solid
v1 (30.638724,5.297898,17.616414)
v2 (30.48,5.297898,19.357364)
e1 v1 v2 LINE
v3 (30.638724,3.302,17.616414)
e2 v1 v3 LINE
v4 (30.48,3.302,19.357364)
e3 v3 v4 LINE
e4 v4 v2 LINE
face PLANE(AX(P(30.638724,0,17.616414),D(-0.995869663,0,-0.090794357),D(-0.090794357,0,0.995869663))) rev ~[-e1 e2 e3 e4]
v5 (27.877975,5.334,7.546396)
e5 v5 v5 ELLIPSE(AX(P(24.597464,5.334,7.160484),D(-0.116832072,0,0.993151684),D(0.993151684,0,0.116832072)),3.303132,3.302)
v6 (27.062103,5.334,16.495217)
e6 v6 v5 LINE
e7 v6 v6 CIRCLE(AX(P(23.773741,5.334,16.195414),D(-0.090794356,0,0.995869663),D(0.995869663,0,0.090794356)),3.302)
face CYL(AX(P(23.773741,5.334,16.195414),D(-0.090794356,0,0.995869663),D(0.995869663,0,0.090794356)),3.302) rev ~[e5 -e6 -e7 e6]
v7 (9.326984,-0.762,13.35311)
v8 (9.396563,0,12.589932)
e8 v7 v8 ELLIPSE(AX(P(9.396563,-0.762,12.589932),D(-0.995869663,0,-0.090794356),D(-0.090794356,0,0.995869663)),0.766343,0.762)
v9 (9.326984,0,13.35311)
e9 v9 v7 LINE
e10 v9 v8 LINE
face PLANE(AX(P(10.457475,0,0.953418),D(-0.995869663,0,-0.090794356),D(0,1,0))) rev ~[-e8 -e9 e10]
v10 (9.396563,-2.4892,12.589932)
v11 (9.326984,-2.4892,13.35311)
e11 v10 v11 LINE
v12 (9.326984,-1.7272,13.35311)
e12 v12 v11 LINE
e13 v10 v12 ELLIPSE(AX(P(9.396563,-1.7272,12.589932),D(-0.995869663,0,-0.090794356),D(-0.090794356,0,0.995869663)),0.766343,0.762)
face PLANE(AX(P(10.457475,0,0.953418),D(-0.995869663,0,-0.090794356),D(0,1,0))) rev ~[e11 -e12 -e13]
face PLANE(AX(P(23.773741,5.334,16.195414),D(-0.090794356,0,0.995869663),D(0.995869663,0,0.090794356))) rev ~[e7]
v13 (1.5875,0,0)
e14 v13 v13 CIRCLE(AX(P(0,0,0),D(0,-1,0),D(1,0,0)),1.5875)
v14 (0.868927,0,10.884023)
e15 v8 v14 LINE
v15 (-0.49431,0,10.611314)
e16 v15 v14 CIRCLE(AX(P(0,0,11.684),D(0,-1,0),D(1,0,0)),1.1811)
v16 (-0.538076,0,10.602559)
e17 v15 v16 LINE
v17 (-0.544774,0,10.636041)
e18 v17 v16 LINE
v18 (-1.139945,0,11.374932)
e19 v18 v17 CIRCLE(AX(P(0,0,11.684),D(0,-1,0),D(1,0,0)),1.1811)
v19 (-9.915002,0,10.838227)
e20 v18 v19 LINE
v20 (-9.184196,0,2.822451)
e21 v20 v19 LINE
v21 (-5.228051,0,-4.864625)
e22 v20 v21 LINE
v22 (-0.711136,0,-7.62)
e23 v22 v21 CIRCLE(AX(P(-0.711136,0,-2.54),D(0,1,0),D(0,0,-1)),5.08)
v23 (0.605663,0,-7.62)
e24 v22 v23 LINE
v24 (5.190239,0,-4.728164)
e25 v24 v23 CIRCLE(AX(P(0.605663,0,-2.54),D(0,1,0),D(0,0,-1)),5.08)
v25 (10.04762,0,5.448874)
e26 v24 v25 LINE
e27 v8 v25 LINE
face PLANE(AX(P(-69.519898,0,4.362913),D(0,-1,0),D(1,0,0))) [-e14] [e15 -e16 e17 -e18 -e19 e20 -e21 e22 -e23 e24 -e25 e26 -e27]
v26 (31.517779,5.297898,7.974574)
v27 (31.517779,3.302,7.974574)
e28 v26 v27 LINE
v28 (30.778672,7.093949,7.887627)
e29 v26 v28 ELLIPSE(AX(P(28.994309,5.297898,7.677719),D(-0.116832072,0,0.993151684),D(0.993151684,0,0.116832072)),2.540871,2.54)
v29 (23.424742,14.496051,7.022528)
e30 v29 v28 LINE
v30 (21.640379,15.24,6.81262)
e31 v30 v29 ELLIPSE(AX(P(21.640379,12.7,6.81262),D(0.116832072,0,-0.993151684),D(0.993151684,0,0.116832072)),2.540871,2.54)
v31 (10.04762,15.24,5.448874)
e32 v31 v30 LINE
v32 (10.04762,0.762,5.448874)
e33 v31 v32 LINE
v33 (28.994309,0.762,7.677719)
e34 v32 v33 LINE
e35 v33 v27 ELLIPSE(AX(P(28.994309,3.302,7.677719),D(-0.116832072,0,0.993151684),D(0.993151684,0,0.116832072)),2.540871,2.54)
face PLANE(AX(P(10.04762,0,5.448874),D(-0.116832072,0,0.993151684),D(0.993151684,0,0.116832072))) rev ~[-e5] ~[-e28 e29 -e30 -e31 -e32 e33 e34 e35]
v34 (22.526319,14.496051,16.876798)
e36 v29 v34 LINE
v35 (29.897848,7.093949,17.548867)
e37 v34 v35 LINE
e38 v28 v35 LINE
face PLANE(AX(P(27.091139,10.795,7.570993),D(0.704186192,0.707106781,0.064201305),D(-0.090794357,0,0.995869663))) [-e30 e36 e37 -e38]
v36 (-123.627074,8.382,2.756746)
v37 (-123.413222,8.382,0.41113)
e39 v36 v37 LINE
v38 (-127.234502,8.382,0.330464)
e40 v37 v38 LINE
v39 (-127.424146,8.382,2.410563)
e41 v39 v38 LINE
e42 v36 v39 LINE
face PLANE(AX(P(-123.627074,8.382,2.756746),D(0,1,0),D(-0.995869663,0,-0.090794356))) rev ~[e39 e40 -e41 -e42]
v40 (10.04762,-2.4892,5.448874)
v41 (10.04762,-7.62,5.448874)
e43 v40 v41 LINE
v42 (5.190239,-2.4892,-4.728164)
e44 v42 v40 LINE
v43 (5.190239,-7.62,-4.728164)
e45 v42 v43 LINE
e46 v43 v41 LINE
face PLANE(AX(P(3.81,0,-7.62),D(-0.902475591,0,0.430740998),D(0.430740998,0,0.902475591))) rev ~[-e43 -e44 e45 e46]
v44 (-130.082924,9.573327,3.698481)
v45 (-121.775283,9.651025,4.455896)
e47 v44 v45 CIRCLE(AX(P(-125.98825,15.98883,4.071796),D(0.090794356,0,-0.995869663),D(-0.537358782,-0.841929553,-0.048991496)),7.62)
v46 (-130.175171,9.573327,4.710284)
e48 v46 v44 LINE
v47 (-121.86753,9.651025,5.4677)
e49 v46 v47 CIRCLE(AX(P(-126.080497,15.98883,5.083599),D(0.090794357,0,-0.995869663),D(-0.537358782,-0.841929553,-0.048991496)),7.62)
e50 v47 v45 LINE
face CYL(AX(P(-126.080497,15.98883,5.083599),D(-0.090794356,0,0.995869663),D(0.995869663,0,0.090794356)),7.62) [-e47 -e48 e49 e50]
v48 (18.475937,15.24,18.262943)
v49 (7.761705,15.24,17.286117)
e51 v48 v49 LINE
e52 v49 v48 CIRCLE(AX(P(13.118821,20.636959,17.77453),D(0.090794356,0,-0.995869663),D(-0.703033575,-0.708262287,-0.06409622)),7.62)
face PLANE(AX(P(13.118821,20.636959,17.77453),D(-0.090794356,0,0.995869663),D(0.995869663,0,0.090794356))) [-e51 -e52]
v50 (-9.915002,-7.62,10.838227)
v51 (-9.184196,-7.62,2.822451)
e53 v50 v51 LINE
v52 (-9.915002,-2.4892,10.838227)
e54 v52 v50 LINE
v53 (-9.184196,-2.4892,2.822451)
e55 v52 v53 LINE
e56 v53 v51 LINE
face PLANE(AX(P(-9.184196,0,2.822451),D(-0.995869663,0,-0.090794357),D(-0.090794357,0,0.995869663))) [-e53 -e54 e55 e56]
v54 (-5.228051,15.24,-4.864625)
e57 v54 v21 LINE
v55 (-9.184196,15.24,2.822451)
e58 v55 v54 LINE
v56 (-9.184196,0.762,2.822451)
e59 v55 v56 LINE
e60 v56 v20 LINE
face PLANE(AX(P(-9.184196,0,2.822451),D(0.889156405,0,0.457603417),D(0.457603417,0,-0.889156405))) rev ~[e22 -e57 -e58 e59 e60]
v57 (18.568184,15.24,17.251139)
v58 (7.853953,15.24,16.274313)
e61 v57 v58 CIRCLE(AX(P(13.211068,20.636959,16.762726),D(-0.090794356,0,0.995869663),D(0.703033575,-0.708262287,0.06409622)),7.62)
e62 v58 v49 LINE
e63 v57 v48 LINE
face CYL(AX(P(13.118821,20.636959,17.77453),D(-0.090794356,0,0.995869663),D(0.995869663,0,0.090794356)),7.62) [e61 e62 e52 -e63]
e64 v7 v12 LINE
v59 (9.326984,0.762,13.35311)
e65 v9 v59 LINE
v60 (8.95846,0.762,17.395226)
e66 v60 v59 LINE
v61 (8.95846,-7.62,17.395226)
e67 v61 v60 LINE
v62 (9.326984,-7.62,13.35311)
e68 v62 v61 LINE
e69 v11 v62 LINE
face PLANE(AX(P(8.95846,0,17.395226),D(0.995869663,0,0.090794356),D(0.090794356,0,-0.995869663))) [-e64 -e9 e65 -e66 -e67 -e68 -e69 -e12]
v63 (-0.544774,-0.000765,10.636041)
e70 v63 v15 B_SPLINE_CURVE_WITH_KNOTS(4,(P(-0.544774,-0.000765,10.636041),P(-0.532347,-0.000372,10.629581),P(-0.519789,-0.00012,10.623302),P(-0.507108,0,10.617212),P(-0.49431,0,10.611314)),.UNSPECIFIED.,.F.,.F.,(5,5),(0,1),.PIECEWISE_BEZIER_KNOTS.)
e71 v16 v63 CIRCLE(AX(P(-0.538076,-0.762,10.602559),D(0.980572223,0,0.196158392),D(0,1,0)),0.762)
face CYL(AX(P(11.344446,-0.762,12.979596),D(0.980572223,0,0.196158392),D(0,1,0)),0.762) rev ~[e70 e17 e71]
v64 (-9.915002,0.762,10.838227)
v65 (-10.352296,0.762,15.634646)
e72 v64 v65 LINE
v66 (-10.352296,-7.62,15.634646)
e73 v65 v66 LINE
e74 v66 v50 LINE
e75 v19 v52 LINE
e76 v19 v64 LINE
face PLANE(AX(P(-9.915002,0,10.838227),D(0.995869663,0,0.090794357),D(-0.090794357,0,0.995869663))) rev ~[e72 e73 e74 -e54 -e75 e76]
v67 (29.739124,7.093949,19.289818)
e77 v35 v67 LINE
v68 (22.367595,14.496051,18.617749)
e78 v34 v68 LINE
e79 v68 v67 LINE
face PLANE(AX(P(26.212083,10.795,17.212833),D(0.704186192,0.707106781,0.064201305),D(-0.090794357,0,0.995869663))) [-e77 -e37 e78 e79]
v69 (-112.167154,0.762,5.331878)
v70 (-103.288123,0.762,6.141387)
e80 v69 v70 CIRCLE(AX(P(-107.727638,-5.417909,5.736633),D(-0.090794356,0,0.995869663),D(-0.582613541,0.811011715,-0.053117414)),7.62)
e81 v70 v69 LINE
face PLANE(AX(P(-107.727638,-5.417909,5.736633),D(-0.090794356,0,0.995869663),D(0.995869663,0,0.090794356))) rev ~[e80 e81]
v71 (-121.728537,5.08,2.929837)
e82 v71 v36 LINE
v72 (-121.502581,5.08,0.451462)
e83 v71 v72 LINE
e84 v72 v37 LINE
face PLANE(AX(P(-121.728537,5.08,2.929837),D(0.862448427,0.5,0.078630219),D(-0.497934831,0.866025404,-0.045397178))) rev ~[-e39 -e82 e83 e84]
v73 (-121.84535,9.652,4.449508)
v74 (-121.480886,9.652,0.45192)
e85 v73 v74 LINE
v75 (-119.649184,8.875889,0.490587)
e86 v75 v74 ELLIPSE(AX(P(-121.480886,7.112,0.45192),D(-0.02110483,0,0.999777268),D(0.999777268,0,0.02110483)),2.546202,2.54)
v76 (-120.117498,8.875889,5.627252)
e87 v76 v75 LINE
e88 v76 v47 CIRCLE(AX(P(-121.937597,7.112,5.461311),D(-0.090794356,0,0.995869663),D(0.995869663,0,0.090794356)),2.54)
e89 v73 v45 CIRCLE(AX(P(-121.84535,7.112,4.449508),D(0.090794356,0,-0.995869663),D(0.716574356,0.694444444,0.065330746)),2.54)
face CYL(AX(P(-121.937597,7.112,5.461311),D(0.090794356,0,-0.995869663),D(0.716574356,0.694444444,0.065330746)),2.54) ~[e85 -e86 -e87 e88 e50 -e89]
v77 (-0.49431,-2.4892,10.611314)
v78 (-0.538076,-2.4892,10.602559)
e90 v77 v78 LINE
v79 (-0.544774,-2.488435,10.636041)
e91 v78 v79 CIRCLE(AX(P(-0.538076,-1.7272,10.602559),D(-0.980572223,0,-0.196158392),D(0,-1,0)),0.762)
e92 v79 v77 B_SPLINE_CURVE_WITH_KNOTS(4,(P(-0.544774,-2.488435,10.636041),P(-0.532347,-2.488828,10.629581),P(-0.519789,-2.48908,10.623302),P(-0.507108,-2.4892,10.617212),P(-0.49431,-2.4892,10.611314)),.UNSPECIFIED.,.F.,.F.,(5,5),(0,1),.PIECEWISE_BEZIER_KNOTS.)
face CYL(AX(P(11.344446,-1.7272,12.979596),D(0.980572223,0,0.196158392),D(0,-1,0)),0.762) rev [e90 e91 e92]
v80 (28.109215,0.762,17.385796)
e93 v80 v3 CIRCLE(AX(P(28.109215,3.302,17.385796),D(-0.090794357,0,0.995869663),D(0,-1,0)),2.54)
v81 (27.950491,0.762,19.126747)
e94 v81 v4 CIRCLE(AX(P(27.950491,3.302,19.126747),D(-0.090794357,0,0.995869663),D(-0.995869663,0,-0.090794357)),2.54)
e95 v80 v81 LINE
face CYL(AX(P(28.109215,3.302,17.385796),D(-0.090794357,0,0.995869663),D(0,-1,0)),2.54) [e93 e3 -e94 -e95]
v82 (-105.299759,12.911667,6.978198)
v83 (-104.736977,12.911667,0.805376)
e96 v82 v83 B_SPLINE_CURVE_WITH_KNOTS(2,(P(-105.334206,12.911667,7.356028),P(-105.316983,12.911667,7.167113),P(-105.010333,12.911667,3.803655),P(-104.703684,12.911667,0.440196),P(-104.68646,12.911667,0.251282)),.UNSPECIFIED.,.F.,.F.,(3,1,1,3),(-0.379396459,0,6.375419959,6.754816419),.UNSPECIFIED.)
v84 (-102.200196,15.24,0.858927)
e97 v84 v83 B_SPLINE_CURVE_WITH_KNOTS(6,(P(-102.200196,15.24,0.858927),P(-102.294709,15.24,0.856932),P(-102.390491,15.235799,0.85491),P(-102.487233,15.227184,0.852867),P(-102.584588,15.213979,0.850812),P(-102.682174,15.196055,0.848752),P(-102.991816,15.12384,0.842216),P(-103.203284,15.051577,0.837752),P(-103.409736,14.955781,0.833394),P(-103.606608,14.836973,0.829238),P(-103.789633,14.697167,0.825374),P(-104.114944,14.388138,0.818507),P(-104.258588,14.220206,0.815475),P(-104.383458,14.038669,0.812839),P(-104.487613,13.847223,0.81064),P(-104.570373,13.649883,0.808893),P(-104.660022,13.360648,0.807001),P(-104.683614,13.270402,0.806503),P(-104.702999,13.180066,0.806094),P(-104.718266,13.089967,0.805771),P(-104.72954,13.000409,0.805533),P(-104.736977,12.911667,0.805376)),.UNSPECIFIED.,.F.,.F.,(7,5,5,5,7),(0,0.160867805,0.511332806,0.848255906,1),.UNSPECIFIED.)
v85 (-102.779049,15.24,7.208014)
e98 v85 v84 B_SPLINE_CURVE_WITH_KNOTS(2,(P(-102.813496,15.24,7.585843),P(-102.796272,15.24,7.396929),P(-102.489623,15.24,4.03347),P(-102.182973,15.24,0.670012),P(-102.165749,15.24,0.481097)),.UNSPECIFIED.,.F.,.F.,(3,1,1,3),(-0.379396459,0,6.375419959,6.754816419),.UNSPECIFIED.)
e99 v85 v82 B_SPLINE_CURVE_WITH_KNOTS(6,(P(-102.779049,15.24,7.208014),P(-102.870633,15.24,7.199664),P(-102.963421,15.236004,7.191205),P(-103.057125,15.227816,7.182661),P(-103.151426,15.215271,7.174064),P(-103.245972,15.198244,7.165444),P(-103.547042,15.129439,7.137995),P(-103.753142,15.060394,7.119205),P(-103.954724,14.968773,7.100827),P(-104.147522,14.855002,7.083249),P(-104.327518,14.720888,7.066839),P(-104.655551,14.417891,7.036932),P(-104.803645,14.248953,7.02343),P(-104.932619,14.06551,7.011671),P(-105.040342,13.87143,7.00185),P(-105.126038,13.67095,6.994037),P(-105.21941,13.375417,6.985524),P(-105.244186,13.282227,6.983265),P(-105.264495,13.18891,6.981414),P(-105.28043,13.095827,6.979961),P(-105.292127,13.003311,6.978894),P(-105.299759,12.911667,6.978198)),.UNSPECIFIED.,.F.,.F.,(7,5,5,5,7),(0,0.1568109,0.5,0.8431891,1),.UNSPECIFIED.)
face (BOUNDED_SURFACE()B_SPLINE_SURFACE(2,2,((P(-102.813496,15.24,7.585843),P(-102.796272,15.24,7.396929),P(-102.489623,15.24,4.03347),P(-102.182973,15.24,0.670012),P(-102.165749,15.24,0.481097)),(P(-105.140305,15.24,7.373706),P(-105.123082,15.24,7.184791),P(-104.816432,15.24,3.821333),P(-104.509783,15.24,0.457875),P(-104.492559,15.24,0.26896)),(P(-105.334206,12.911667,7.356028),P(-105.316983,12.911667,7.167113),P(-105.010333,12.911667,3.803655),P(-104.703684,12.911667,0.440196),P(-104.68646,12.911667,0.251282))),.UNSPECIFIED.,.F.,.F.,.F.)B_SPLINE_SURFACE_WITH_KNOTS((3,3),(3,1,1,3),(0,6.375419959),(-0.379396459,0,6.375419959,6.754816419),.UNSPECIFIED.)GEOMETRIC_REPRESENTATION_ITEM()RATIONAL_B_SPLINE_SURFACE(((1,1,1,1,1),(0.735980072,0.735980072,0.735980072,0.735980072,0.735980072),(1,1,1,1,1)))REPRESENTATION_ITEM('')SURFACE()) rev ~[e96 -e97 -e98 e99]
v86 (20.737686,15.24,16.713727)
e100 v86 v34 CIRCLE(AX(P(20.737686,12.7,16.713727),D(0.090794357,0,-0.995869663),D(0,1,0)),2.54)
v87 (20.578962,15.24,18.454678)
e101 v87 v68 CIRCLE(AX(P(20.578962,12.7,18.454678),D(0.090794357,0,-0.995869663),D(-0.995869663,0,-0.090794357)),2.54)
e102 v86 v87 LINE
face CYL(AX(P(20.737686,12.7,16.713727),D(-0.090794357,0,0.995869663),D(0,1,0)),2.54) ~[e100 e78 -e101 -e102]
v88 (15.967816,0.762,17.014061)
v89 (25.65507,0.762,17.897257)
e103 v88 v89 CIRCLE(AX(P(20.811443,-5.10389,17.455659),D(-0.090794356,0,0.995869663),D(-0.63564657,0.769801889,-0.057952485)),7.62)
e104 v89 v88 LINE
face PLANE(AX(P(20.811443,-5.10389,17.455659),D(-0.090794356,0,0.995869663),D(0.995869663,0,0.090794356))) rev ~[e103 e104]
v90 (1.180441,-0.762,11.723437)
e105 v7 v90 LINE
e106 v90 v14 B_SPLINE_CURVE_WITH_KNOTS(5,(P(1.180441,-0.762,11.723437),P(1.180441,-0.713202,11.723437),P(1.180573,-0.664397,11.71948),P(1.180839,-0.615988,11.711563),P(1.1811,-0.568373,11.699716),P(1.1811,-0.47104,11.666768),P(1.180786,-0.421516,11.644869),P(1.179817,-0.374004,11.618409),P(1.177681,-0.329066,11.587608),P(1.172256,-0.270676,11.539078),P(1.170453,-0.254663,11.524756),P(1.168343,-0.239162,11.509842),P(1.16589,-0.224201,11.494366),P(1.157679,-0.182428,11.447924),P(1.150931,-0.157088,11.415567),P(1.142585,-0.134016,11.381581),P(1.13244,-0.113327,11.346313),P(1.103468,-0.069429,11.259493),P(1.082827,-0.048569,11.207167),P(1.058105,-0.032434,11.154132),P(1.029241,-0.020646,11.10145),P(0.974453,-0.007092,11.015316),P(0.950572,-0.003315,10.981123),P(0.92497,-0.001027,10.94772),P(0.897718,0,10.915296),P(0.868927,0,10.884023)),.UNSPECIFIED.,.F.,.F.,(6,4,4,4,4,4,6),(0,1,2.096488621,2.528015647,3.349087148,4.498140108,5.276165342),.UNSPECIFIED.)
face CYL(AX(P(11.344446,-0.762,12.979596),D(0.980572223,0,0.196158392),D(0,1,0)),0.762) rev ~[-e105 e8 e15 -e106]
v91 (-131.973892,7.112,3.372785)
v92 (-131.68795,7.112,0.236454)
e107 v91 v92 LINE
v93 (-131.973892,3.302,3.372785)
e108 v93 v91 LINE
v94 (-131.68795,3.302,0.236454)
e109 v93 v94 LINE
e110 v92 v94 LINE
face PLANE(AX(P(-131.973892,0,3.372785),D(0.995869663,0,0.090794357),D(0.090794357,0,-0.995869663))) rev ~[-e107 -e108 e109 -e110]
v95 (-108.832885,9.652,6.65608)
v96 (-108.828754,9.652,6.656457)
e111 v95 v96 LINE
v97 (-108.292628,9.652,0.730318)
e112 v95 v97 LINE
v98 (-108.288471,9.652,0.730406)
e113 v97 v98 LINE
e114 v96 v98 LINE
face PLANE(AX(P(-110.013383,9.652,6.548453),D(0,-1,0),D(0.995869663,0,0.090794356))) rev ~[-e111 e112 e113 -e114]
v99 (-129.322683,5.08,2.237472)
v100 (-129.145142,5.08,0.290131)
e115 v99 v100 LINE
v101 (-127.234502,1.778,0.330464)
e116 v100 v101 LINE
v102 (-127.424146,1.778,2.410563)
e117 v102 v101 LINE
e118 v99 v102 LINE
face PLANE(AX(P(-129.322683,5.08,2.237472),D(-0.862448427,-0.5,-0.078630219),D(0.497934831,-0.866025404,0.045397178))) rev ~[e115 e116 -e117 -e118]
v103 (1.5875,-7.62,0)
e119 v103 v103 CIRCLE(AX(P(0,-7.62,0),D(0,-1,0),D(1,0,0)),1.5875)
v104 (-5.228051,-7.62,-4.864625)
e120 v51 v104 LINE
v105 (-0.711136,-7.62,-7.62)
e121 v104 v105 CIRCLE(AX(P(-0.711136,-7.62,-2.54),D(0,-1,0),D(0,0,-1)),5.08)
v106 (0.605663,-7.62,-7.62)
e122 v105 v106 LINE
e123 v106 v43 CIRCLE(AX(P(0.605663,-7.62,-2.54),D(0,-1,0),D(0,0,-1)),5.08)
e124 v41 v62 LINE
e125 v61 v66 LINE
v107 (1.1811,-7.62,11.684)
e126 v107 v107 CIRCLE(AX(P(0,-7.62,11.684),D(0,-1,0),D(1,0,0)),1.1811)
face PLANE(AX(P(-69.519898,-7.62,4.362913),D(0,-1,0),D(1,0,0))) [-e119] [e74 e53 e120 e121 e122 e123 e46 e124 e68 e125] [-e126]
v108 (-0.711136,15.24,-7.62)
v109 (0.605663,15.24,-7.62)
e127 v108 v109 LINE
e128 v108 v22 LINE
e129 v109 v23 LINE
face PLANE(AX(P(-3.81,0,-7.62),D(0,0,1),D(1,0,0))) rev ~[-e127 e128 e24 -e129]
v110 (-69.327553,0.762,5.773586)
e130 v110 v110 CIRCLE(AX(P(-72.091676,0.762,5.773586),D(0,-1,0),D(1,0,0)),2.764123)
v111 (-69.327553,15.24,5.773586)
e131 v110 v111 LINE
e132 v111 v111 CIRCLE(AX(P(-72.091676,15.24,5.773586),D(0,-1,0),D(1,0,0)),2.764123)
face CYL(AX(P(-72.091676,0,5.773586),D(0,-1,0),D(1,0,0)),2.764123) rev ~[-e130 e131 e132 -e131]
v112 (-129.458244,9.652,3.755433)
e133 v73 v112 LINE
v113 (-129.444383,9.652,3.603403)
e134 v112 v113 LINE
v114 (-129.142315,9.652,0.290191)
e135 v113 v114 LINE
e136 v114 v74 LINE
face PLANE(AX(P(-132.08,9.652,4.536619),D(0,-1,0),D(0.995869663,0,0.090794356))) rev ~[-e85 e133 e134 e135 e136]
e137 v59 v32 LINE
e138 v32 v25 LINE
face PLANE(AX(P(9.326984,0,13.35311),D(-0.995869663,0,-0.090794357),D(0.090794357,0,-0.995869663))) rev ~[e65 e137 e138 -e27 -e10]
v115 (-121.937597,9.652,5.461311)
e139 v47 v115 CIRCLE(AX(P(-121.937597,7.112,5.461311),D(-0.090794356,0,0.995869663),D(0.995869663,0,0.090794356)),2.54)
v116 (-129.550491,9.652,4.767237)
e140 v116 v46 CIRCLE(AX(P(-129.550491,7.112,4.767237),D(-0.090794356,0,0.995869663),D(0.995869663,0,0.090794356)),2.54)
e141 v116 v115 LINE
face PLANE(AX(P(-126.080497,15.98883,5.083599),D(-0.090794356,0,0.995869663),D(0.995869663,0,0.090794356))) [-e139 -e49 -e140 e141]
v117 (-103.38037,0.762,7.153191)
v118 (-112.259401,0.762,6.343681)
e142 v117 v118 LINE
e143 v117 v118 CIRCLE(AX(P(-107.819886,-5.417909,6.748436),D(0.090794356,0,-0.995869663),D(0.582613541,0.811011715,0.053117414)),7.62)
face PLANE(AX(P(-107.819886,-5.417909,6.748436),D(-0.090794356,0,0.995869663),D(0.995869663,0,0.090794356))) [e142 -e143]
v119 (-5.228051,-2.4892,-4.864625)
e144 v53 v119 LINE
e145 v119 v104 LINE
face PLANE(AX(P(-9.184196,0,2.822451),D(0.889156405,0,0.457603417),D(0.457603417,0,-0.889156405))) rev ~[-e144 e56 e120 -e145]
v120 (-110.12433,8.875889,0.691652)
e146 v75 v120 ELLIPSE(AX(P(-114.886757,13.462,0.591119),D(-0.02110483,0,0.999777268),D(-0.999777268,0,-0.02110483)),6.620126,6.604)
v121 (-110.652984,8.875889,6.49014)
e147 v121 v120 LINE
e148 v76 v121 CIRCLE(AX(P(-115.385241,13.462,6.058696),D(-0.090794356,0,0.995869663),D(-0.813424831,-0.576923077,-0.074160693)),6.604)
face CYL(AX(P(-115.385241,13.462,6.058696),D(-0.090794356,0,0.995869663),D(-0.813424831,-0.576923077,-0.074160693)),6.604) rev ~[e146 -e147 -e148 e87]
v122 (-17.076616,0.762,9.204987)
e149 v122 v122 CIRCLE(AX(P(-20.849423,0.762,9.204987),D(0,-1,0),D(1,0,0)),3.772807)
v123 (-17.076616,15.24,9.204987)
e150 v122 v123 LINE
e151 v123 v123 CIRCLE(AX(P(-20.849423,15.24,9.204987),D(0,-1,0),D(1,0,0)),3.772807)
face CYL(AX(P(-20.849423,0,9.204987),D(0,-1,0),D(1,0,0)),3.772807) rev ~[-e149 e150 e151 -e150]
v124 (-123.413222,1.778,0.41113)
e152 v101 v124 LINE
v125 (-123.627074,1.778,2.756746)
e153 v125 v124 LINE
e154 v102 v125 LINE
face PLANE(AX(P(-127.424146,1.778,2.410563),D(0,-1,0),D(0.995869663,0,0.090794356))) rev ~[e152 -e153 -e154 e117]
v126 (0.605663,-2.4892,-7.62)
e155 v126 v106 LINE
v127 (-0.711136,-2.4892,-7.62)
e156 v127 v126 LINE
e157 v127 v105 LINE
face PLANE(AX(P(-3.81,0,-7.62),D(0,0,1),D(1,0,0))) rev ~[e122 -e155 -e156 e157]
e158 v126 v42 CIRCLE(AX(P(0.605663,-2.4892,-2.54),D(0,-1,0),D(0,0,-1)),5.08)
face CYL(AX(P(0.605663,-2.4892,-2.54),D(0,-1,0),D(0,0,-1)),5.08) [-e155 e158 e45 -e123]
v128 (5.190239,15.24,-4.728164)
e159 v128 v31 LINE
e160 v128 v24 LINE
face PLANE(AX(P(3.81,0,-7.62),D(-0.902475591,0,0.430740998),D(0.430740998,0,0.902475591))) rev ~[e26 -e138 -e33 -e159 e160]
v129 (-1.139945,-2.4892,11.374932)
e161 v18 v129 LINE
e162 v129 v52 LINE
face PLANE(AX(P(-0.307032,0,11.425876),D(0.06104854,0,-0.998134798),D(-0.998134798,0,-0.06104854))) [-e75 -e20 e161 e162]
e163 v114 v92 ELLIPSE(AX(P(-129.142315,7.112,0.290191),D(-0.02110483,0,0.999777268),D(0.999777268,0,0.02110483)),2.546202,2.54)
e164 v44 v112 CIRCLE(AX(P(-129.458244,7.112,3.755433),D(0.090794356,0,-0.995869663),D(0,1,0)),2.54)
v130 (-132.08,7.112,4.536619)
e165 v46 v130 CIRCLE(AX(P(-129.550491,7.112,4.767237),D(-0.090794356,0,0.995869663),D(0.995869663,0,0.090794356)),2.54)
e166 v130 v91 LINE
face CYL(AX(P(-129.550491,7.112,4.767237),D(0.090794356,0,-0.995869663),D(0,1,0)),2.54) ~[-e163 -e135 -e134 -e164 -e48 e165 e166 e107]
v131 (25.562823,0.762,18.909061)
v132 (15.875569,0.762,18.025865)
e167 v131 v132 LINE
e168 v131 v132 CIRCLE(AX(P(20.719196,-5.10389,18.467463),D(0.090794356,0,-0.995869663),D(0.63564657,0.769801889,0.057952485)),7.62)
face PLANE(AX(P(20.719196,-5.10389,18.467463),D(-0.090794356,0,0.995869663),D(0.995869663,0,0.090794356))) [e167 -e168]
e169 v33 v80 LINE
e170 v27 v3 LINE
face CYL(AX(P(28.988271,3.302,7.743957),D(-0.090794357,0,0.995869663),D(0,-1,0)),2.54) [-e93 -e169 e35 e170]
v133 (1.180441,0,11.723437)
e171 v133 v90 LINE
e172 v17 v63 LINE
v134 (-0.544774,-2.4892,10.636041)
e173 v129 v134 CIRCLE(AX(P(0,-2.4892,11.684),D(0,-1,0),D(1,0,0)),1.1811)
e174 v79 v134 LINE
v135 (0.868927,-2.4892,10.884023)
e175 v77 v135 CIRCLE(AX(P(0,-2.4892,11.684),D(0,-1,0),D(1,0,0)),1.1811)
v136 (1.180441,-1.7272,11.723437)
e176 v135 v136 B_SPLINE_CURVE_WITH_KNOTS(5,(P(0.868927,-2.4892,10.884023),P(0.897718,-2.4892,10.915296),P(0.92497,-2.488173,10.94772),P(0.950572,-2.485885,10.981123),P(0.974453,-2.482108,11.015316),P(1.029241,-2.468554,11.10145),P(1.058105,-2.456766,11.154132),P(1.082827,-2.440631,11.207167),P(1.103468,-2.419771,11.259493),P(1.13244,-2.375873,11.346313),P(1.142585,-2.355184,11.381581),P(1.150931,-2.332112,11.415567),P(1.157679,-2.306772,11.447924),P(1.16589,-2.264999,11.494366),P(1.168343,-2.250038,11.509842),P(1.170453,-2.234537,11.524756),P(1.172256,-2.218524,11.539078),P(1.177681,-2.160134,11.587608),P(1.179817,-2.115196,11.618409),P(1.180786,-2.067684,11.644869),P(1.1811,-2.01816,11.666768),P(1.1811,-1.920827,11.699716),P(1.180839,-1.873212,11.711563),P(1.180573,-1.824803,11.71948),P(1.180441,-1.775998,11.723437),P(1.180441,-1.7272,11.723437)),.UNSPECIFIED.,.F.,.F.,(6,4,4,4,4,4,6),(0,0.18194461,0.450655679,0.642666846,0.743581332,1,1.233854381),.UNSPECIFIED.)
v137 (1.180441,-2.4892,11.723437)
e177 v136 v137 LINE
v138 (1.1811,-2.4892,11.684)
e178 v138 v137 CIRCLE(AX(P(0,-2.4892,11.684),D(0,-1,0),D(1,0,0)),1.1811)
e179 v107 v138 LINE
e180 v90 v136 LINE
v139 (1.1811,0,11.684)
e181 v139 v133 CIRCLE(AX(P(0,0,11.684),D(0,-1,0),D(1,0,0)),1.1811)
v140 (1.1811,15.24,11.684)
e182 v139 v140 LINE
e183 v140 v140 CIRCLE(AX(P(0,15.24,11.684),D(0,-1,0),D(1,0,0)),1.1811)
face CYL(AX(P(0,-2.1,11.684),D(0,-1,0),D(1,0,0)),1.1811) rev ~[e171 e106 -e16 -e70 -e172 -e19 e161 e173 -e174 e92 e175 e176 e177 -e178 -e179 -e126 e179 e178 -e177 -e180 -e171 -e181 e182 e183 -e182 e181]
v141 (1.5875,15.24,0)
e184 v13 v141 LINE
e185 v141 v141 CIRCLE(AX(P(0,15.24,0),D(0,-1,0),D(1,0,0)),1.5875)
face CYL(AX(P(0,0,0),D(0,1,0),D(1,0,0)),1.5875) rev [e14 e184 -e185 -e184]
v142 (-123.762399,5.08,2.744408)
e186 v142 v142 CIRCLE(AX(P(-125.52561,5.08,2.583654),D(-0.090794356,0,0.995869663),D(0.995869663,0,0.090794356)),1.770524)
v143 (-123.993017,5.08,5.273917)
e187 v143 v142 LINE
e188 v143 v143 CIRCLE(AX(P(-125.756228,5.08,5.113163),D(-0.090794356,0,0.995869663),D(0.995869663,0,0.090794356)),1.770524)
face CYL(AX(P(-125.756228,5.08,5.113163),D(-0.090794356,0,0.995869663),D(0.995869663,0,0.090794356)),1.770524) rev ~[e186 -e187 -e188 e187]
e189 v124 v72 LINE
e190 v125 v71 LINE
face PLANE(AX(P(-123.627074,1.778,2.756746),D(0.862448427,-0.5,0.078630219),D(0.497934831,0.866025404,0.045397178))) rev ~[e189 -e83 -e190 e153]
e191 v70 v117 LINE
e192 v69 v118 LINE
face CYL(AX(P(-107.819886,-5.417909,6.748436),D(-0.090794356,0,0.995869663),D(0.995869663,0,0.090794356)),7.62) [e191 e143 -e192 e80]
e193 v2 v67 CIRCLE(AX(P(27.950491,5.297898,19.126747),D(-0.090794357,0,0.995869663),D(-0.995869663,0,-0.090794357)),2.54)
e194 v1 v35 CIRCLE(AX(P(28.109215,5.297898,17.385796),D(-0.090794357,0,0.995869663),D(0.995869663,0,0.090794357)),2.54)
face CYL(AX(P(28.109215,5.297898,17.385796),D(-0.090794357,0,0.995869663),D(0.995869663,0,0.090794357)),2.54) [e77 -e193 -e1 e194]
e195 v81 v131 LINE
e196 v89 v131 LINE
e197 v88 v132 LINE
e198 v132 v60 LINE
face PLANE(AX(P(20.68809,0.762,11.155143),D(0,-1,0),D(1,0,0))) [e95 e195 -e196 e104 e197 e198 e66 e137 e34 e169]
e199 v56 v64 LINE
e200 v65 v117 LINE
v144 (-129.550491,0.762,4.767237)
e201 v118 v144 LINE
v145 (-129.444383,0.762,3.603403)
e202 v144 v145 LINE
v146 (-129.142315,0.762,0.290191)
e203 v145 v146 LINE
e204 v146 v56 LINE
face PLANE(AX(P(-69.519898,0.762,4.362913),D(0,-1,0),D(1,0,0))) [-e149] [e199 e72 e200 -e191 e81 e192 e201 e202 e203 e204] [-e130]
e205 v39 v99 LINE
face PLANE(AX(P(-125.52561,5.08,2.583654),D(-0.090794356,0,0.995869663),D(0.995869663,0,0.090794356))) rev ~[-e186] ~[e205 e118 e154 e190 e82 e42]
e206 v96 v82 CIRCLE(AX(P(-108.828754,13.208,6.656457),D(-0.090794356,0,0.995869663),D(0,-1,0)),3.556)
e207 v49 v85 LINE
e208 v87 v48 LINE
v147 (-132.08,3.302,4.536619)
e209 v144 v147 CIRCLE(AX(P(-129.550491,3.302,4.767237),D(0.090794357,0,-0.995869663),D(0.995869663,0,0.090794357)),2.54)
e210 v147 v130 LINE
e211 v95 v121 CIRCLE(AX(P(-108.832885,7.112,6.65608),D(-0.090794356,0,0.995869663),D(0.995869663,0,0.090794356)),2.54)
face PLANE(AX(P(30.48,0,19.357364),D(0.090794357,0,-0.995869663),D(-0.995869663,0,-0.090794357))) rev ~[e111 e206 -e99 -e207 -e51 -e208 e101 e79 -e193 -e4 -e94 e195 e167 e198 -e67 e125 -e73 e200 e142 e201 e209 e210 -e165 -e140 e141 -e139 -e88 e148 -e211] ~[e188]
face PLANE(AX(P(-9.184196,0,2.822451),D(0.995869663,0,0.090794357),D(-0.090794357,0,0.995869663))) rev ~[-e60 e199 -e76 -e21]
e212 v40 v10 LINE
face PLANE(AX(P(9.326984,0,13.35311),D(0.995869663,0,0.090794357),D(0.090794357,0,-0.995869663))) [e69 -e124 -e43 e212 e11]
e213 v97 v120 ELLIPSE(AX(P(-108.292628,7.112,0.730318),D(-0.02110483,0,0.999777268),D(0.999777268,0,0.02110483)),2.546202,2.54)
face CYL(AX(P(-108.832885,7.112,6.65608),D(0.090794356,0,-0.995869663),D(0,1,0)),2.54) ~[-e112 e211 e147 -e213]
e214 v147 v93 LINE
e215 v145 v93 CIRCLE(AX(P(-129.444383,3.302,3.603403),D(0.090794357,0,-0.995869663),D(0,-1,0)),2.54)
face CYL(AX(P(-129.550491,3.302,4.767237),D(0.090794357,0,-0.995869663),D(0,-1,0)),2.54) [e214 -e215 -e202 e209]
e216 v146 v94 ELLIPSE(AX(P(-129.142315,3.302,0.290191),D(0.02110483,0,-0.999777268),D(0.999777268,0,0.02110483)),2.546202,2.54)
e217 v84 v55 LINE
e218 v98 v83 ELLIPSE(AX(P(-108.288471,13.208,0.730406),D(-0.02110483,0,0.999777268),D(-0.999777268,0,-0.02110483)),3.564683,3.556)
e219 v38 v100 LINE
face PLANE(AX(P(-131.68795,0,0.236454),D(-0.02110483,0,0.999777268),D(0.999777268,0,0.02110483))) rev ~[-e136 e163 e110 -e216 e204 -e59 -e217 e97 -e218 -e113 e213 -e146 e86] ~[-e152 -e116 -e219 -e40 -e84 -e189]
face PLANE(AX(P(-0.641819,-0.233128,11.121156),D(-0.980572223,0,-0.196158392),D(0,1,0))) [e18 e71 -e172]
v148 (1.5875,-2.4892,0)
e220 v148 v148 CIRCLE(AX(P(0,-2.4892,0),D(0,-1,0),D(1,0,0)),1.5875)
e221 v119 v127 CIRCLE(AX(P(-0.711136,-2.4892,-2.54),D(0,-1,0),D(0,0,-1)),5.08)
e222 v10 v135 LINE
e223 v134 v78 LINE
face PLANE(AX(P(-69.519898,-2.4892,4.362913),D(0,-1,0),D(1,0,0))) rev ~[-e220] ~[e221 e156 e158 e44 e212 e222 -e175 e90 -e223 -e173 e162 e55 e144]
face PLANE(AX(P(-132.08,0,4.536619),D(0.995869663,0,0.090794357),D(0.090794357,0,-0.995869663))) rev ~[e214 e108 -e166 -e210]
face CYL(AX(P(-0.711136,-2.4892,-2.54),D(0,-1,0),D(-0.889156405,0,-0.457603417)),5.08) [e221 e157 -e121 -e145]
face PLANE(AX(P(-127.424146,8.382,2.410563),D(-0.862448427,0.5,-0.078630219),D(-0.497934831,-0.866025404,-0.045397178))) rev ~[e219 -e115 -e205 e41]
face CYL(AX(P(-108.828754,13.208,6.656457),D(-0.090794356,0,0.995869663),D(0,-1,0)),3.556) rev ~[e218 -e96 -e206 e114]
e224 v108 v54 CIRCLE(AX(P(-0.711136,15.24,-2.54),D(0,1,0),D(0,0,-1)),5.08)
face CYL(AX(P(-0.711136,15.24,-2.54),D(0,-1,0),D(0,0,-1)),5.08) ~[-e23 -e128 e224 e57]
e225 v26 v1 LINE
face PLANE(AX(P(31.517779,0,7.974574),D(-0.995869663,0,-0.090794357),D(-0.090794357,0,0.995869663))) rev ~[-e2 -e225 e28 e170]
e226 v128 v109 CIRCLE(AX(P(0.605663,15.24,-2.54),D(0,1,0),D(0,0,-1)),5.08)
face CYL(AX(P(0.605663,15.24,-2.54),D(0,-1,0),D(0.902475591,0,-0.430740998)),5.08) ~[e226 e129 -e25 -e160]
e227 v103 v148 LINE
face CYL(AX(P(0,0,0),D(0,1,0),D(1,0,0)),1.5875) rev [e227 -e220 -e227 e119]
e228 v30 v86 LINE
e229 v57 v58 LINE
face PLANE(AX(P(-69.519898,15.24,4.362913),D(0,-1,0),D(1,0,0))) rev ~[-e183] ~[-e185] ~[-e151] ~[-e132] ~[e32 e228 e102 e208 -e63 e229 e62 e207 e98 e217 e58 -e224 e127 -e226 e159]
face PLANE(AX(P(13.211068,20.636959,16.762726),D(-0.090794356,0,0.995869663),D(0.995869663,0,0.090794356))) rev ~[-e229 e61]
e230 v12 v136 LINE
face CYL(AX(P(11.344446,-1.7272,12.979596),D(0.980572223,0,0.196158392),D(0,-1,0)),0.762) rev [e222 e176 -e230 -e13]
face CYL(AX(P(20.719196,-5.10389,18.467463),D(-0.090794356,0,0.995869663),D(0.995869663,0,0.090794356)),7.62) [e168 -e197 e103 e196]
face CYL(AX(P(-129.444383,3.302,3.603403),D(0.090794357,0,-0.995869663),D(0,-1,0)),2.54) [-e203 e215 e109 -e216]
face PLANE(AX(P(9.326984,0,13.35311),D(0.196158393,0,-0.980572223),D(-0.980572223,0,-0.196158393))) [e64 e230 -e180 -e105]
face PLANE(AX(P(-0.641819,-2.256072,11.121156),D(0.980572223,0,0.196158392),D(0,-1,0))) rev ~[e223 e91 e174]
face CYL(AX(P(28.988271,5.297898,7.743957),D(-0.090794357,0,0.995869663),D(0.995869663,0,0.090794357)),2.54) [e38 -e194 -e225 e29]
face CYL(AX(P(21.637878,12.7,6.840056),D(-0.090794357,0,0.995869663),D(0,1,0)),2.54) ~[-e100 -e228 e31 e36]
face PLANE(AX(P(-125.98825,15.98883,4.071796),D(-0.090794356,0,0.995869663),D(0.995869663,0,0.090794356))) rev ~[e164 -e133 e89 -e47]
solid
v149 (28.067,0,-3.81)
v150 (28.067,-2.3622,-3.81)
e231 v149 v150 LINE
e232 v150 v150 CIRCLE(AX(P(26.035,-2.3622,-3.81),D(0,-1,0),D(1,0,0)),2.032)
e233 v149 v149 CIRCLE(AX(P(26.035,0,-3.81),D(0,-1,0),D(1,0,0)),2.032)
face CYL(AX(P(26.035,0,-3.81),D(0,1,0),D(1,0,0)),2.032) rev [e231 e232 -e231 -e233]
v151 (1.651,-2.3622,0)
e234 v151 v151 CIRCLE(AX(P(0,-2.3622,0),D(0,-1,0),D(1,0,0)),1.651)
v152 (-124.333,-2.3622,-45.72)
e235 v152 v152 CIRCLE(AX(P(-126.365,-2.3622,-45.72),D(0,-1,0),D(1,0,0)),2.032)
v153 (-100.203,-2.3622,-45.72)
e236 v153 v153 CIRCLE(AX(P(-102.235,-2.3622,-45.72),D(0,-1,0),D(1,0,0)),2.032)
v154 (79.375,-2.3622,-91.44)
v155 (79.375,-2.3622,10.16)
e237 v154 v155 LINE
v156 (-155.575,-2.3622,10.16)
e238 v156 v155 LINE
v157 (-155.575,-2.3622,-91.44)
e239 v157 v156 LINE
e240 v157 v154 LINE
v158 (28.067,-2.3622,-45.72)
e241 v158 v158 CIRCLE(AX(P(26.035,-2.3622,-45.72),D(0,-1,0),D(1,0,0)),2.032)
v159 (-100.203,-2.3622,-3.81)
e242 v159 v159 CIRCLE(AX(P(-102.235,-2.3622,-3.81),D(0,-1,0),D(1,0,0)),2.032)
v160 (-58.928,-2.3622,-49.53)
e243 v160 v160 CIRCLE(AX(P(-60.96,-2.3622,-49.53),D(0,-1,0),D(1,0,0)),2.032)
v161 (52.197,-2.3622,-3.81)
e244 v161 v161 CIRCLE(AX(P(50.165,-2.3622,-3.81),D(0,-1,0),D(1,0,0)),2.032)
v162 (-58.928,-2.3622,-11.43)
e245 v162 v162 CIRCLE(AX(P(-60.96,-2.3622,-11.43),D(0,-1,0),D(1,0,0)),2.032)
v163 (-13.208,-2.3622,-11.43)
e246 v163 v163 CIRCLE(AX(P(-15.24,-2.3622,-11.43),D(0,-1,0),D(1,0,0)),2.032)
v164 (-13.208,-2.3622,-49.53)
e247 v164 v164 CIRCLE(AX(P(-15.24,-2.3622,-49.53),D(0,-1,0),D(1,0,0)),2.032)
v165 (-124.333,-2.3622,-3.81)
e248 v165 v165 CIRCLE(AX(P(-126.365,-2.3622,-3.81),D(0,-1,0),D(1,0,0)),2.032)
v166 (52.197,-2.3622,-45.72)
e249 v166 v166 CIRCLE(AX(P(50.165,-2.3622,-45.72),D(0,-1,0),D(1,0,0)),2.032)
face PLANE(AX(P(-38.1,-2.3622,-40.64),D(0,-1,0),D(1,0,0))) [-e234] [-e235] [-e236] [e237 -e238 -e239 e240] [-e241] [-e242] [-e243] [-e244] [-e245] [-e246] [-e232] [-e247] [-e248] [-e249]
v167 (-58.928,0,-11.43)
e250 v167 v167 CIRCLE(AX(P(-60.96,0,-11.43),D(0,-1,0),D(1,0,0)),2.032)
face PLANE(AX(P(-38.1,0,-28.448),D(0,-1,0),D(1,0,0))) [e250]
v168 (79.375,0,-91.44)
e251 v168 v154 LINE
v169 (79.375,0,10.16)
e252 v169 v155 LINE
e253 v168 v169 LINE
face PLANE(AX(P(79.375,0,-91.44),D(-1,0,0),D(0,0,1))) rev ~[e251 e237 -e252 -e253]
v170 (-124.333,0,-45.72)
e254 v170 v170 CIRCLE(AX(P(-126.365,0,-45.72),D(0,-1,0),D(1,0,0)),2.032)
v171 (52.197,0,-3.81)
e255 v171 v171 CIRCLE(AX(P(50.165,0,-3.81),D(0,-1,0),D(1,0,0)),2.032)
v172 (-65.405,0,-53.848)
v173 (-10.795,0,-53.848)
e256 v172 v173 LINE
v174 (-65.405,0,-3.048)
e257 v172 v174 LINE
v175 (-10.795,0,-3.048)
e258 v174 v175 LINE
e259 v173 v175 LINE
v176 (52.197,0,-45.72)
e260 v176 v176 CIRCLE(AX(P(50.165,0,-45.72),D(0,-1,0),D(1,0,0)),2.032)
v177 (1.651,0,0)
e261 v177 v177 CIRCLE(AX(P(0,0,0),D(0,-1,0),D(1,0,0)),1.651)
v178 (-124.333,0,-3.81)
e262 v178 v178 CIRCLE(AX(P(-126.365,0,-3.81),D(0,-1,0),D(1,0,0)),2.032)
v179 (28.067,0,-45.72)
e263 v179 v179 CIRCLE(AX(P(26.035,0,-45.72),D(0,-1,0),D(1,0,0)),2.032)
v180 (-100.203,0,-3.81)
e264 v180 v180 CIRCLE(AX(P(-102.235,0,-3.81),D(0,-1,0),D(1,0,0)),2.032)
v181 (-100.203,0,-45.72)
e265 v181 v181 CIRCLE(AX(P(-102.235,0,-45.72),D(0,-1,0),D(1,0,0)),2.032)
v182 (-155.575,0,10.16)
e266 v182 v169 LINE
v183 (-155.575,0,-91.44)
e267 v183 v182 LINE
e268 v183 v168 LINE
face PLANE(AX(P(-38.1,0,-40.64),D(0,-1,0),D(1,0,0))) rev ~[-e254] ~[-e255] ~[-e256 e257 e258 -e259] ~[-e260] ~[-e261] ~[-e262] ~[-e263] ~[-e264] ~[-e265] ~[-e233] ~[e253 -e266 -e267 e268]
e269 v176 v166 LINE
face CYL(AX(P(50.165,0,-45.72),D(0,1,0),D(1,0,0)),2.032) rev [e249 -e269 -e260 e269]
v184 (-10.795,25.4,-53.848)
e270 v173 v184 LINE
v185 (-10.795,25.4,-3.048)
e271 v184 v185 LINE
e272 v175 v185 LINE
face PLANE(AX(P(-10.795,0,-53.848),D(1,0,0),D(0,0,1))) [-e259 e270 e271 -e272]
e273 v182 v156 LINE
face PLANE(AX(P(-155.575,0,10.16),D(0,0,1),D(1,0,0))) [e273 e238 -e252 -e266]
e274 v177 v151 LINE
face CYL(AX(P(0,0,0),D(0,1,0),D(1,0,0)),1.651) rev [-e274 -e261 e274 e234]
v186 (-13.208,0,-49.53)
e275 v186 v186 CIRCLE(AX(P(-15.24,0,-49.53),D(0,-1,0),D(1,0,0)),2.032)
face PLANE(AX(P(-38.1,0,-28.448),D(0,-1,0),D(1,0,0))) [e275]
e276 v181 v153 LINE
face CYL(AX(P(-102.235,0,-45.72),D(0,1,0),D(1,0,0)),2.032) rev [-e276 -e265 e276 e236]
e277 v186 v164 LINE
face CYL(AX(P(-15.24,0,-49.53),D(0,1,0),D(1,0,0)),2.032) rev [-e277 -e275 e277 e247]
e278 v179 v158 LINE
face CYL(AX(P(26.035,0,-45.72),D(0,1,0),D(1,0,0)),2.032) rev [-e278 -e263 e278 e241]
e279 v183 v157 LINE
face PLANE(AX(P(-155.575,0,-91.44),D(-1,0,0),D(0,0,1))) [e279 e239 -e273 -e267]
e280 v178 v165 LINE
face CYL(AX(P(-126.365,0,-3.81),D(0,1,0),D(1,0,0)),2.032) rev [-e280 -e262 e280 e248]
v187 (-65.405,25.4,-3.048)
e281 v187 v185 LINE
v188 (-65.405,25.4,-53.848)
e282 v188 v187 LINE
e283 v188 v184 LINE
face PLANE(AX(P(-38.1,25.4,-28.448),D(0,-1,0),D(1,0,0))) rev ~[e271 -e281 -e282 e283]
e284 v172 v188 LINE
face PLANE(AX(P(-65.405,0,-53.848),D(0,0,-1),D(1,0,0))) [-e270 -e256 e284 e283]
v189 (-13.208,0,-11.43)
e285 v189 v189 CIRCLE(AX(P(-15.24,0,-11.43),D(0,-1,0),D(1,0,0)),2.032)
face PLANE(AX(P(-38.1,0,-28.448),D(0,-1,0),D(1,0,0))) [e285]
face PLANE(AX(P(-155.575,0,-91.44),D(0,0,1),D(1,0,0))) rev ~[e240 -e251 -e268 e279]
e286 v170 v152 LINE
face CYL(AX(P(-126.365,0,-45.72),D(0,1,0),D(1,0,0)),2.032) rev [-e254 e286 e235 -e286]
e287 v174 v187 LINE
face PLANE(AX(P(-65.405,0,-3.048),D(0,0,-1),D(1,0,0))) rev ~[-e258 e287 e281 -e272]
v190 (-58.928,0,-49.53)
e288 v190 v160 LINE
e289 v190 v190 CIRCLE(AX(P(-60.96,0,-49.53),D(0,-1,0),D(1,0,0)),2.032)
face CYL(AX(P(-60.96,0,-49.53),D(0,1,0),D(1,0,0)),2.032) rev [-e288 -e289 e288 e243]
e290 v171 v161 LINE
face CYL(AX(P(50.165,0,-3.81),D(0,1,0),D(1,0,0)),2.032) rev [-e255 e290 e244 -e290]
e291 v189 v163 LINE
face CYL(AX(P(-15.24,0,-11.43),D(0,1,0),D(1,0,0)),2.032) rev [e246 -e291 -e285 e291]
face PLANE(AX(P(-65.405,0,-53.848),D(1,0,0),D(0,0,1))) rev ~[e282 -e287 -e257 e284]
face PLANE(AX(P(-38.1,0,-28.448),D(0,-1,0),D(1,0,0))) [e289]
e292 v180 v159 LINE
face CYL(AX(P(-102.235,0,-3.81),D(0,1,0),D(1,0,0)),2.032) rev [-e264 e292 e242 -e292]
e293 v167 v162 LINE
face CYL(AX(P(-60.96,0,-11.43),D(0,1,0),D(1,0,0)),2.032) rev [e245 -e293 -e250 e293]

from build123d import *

# Parameters (mm, degrees)
F0_R          = 1.5875
F1_DEPTH      = 15.24
F1_DEPTH_BACK = 7.62
F2_DEPTH      = 2.4892
F3_DEPTH      = 25.4
F3_DEPTH_BACK = 0.762
F4_R          = 5.08
F5_R          = 1.7705235874
F6_DEPTH      = 26.9611633365
F7_W          = 234.95
F7_H          = 101.6
F7_R          = 2.032
F7_R_2        = 1.651
F8_DEPTH      = 2.3622
F10_DEPTH     = 114.7801239931
F11_W         = 54.61
F11_H         = 50.8
F12_DEPTH     = 25.4
F14_R         = 1.7705235874
F15_DEPTH     = 25.4
F16_R         = 3.302
F17_DEPTH     = 25.4
F18_SIZE      = 8.89
F19_R         = 1.1811
F20_DEPTH     = 48.26
F21_T4_DEPTH  = 12.1179471252
F21_S5_R      = 1.1811
F21_T6_DEPTH  = 8
F21_T11_DEPTH = 12.1179471252
F21_S12_R     = 1.1811
F21_T13_DEPTH = 8
F22_R         = 2.54
F23_R         = 7.62
F24_DEPTH     = 1.016
F25_R         = 3.7728074262
F25_R_2       = 2.7641232058
F26_DEPTH     = 28.2579587291


# Not quite as in the source:
# - a fillet or chamfer that OpenCascade refuses, or shapes differently, is made with other operations: its cross-section is extruded or revolved along the edge and cut away or added


with BuildPart() as f1:
    # F0 (on Front) → F1 (new body, two sides)
    with BuildSketch(Plane.XZ) as f1_sk:
        Polygon((-9.9150021419, 10.8382269042), (-131.9738921994, 3.3727853757), (-131.6879499686, 0.2364539576), (-9.1841964381, 2.8224508396), align=None)
        Polygon((-10.3522961262, 15.6346462997), (-132.08, 4.5366191606), (-131.9738921994, 3.3727853757), (-9.9150021419, 10.8382269042), align=None)
        Polygon((8.9584602173, 17.3952257829), (-10.3522961262, 15.6346462997), (-9.9150021419, 10.8382269042), (-0.3070324239, 11.4258755065), (9.3269835997, 13.3531104945), align=None)
        Polygon((-0.3070324239, 11.4258755065), (-9.9150021419, 10.8382269042), (-9.1841964381, 2.8224508396), (-3.81, -7.62), (3.81, -7.62), (10.047620121, 5.4488741869), (9.3269835997, 13.3531104945), align=None)
        Circle(F0_R, mode=Mode.SUBTRACT)
        Polygon((30.6387240807, 17.6164137534), (9.3269835997, 13.3531104945), (10.047620121, 5.4488741869), (31.5177794949, 7.97457419), align=None)
        Polygon((30.48, 19.3573644332), (8.9584602173, 17.3952257829), (9.3269835997, 13.3531104945), (30.6387240807, 17.6164137534), align=None)
    extrude(amount=-F1_DEPTH)
    extrude(f1_sk.sketch, amount=F1_DEPTH_BACK)

    # F0 (on Front) → F2 (cut)
    with BuildSketch(Plane.XZ):
        Polygon((-9.9150021419, 10.8382269042), (-131.9738921994, 3.3727853757), (-131.6879499686, 0.2364539576), (-9.1841964381, 2.8224508396), align=None)
        Polygon((-0.3070324239, 11.4258755065), (-9.9150021419, 10.8382269042), (-9.1841964381, 2.8224508396), (-3.81, -7.62), (3.81, -7.62), (10.047620121, 5.4488741869), (9.3269835997, 13.3531104945), align=None)
        Circle(F0_R, mode=Mode.SUBTRACT)
        Polygon((30.6387240807, 17.6164137534), (9.3269835997, 13.3531104945), (10.047620121, 5.4488741869), (31.5177794949, 7.97457419), align=None)
    extrude(amount=F2_DEPTH, mode=Mode.SUBTRACT)

    # F0 (on Front) → F3 (cut, two sides)
    with BuildSketch(Plane.XZ) as f3_sk:
        Polygon((-9.9150021419, 10.8382269042), (-131.9738921994, 3.3727853757), (-131.6879499686, 0.2364539576), (-9.1841964381, 2.8224508396), align=None)
        Polygon((-10.3522961262, 15.6346462997), (-132.08, 4.5366191606), (-131.9738921994, 3.3727853757), (-9.9150021419, 10.8382269042), align=None)
        Polygon((30.6387240807, 17.6164137534), (9.3269835997, 13.3531104945), (10.047620121, 5.4488741869), (31.5177794949, 7.97457419), align=None)
        Polygon((30.48, 19.3573644332), (8.9584602173, 17.3952257829), (9.3269835997, 13.3531104945), (30.6387240807, 17.6164137534), align=None)
    extrude(amount=F3_DEPTH, mode=Mode.SUBTRACT)
    extrude(f3_sk.sketch, amount=-F3_DEPTH_BACK, mode=Mode.SUBTRACT)

    # F4
    f4_edges = [f1.edges().sort_by_distance(p)[0] for p in [
        (-3.81, 7.62, -7.62),
        (-3.81, -5.0546, -7.62),
        (3.81, -5.0546, -7.62),
        (3.81, 7.62, -7.62),
    ]]
    fillet(f4_edges, radius=F4_R)

    # F5 (on face) → F6 (cut, through all)
    with BuildSketch(Plane(origin=(-1.4990148259, 0, 16.441808129), x_dir=(0.9958696626, 0, 0.0907943565), z_dir=(-0.0907943565, 0, 0.9958696626))):
        with Locations((-124.7725656148, 5.08)):
            Circle(F5_R)
    extrude(amount=-F6_DEPTH, mode=Mode.SUBTRACT)

    # F9 (on face) → F10 (cut, through all)
    with BuildSketch(Plane(origin=(-1.4990148259, 0, 16.441808129), x_dir=(0.9958696626, 0, 0.0907943565), z_dir=(-0.0907943565, 0, 0.9958696626))):
        with BuildLine():
            Line((-120.7187174998, 15.24), (-131.1225656148, 15.24))
            Line((-131.1225656148, 15.24), (-131.1225656148, 9.652))
            Line((-131.1225656148, 9.652), (-119.7527028025, 9.652))
            ThreePointArc((-119.7527028025, 9.652), (-120.8660431523, 12.337032401), (-120.7187174998, 15.24))
        make_face()
        with BuildLine():
            ThreePointArc((-107.9984137298, 15.24), (-114.3585656148, 20.066), (-120.7187174998, 15.24))
            Line((-120.7187174998, 15.24), (-107.9984137298, 15.24))
        make_face()
        with BuildLine():
            Line((-107.9984137298, 15.24), (-120.7187174998, 15.24))
            ThreePointArc((-120.7187174998, 15.24), (-120.8660431523, 12.337032401), (-119.7527028025, 9.652))
            Line((-119.7527028025, 9.652), (-108.9644284271, 9.652))
            ThreePointArc((-108.9644284271, 9.652), (-108.0642944899, 11.4632586445), (-107.7545656148, 13.462))
            ThreePointArc((-107.7545656148, 13.462), (-107.8158116439, 14.3593218351), (-107.9984137298, 15.24))
        make_face()
        with BuildLine():
            Line((-104.2188858955, 15.24), (-107.9984137298, 15.24))
            ThreePointArc((-107.9984137298, 15.24), (-107.8158116439, 14.3593218351), (-107.7545656148, 13.462))
            ThreePointArc((-107.7545656148, 13.462), (-108.0642944899, 11.4632586445), (-108.9644284271, 9.652))
            Line((-108.9644284271, 9.652), (-107.7748858955, 9.652))
            ThreePointArc((-107.7748858955, 9.652), (-105.2604141816, 10.6935282861), (-104.2188858955, 13.208))
            Line((-104.2188858955, 13.208), (-104.2188858955, 15.24))
        make_face()
        with BuildLine():
            Line((-108.9644284271, 9.652), (-119.7527028025, 9.652))
            ThreePointArc((-119.7527028025, 9.652), (-114.3585656148, 6.858), (-108.9644284271, 9.652))
        make_face()
    extrude(amount=-F10_DEPTH, mode=Mode.SUBTRACT)

    # F14 (on offset) → F15 (cut)
    with BuildSketch(Plane(origin=(-1.2683971604, 0, 13.9122991861), x_dir=(0.9958696626, 0, 0.0907943565), z_dir=(-0.0907943565, 0, 0.9958696626))):
        Polygon((-128.5853867925, 5.08), (-126.6789762037, 1.778), (-122.8661550259, 1.778), (-120.9597444371, 5.08), (-122.8661550259, 8.382), (-126.6789762037, 8.382), align=None)
        with Locations((-124.7725656148, 5.08)):
            Circle(F14_R, mode=Mode.SUBTRACT)
    extrude(amount=-F15_DEPTH, mode=Mode.SUBTRACT)

    # F16 (on offset) → F17 (cut)
    with BuildSketch(Plane(origin=(-1.2683971604, 0, 13.9122991861), x_dir=(0.9958696626, 0, 0.0907943565), z_dir=(-0.0907943565, 0, 0.9958696626))):
        with Locations((25.146, 5.334)):
            Circle(F16_R)
    extrude(amount=-F17_DEPTH, mode=Mode.SUBTRACT)

    # F18
    f18_edges = [f1.edges().sort_by_distance(p)[0] for p in [
        (30.99889, 15.24, 13.665969),
    ]]
    chamfer(f18_edges, length=F18_SIZE)

    # F19 (on face) → F20 (cut)
    with BuildSketch(Plane.XZ.offset(7.62)):
        with Locations((0, 11.684)):
            Circle(F19_R)
    extrude(amount=-F20_DEPTH, mode=Mode.SUBTRACT)

    # F21: fillet of radius 0.762 on 2 edges, made by hand


with BuildPart() as f8:
    # F7 (on Front) → F8 (new body)
    with BuildSketch(Plane.XZ):
        with Locations((-38.1, -40.64)):
            Rectangle(F7_W, F7_H)
        with Locations((-126.365, -45.72)):
            Circle(F7_R, mode=Mode.SUBTRACT)
        with Locations((-102.235, -45.72)):
            Circle(F7_R, mode=Mode.SUBTRACT)
        with Locations((-60.96, -49.53)):
            Circle(F7_R, mode=Mode.SUBTRACT)
        with Locations((-15.24, -49.53)):
            Circle(F7_R, mode=Mode.SUBTRACT)
        with Locations((26.035, -45.72)):
            Circle(F7_R, mode=Mode.SUBTRACT)
        with Locations((50.165, -45.72)):
            Circle(F7_R, mode=Mode.SUBTRACT)
        with Locations((-126.365, -3.81)):
            Circle(F7_R, mode=Mode.SUBTRACT)
        with Locations((-102.235, -3.81)):
            Circle(F7_R, mode=Mode.SUBTRACT)
        with Locations((-60.96, -11.43)):
            Circle(F7_R, mode=Mode.SUBTRACT)
        with Locations((-15.24, -11.43)):
            Circle(F7_R, mode=Mode.SUBTRACT)
        Circle(F7_R_2, mode=Mode.SUBTRACT)
        with Locations((26.035, -3.81)):
            Circle(F7_R, mode=Mode.SUBTRACT)
        with Locations((50.165, -3.81)):
            Circle(F7_R, mode=Mode.SUBTRACT)
    extrude(amount=F8_DEPTH)

    # F11 (on face) → F12 (join)
    with BuildSketch(Plane.XZ):
        with Locations((-38.1, -28.448)):
            Rectangle(F11_W, F11_H)
    extrude(amount=-F12_DEPTH)


with BuildPart() as f21_tool2:
    # F21_s3 → F21_t4 (new body)
    with BuildSketch(Plane(origin=(13.4045259726, 0, 2.6815059668), x_dir=(0, 1, 0), z_dir=(-0.9805722233, 0, -0.1961583925))):
        with BuildLine():
            ThreePointArc((0, -10.5021231349), (-0.2231846327, -11.0409385022), (-0.762, -11.2641231349))
            Line((-0.762, -11.2641231349), (0, -11.2641231349))
            Line((0, -11.2641231349), (0, -10.5021231349))
        make_face()
    extrude(amount=F21_T4_DEPTH)

    # F21_s5 → F21_t6 (cut, symmetric)
    with BuildSketch(Plane.XZ.offset(0.4)):
        with Locations((0, 11.684)):
            Circle(F21_S5_R)
    extrude(amount=F21_T6_DEPTH, both=True, mode=Mode.SUBTRACT)

    split(bisect_by=Plane(origin=(10.4574750432, 0, 0.9534176539), x_dir=(0, 1, 0), z_dir=(-0.9958696626, 0, -0.0907943565)), keep=Keep.TOP)


with BuildPart() as f1_1:
    add(f1.part)

    # F21_t1: union F21_tool2
    add(f21_tool2.part)


with BuildPart() as f21_tool9:
    # F21_s10 → F21_t11 (new body)
    with BuildSketch(Plane(origin=(13.4045259726, 0, 2.6815059668), x_dir=(0, 1, 0), z_dir=(-0.9805722233, 0, -0.1961583925))):
        with BuildLine():
            ThreePointArc((-2.4892, -10.5021231349), (-2.2660153673, -11.0409385022), (-1.7272, -11.2641231349))
            Line((-1.7272, -11.2641231349), (-2.4892, -11.2641231349))
            Line((-2.4892, -11.2641231349), (-2.4892, -10.5021231349))
        make_face()
    extrude(amount=F21_T11_DEPTH)

    # F21_s12 → F21_t13 (cut, symmetric)
    with BuildSketch(Plane.XZ.offset(2.1)):
        with Locations((0, 11.684)):
            Circle(F21_S12_R)
    extrude(amount=F21_T13_DEPTH, both=True, mode=Mode.SUBTRACT)

    split(bisect_by=Plane(origin=(10.4574750432, 0, 0.9534176539), x_dir=(0, 1, 0), z_dir=(-0.9958696626, 0, -0.0907943565)), keep=Keep.TOP)


with BuildPart() as f1_2:
    add(f1_1.part)

    # F21_t8: union F21_tool9
    add(f21_tool9.part)

    # F22
    f22_edges = [f1_2.edges().sort_by_distance(p)[0] for p in [
        (30.99889, 0.762, 13.665969),
        (30.99889, 6.35, 13.665969),
        (22.156177, 15.24, 12.742892),
        (-131.883975, 9.652, 2.386537),
        (-120.52498, 9.652, 3.022969),
        (-109.747018, 9.652, 3.626846),
        (-105.006011, 15.24, 3.89248),
        (-131.883975, 0.762, 2.386537),
    ]]
    fillet(f22_edges, radius=F22_R)

    # F23 (on face) → F24 (join)
    with BuildSketch(Plane(origin=(-1.4990148259, 0, 16.441808129), x_dir=(0.9958696626, 0, 0.0907943565), z_dir=(-0.0907943565, 0, 0.9958696626))):
        with Locations((14.6784631455, 20.6369586291)):
            Circle(F23_R)
        with Locations((22.310359779, -5.1038903915)):
            Circle(F23_R)
        with Locations((-106.7618331113, -5.4179092716)):
            Circle(F23_R)
        with Locations((-125.0981798966, 15.988830362)):
            Circle(F23_R)
    extrude(amount=-F24_DEPTH)

    # F25 (on Front) → F26 (cut, through all)
    with BuildSketch(Plane.XZ):
        with Locations((-20.849423483, 9.2049865052)):
            Circle(F25_R)
        with Locations((-72.0916762948, 5.7735857554)):
            Circle(F25_R_2)
    extrude(amount=-F26_DEPTH, mode=Mode.SUBTRACT)


solid = Compound([f8.part, f1_2.part])
